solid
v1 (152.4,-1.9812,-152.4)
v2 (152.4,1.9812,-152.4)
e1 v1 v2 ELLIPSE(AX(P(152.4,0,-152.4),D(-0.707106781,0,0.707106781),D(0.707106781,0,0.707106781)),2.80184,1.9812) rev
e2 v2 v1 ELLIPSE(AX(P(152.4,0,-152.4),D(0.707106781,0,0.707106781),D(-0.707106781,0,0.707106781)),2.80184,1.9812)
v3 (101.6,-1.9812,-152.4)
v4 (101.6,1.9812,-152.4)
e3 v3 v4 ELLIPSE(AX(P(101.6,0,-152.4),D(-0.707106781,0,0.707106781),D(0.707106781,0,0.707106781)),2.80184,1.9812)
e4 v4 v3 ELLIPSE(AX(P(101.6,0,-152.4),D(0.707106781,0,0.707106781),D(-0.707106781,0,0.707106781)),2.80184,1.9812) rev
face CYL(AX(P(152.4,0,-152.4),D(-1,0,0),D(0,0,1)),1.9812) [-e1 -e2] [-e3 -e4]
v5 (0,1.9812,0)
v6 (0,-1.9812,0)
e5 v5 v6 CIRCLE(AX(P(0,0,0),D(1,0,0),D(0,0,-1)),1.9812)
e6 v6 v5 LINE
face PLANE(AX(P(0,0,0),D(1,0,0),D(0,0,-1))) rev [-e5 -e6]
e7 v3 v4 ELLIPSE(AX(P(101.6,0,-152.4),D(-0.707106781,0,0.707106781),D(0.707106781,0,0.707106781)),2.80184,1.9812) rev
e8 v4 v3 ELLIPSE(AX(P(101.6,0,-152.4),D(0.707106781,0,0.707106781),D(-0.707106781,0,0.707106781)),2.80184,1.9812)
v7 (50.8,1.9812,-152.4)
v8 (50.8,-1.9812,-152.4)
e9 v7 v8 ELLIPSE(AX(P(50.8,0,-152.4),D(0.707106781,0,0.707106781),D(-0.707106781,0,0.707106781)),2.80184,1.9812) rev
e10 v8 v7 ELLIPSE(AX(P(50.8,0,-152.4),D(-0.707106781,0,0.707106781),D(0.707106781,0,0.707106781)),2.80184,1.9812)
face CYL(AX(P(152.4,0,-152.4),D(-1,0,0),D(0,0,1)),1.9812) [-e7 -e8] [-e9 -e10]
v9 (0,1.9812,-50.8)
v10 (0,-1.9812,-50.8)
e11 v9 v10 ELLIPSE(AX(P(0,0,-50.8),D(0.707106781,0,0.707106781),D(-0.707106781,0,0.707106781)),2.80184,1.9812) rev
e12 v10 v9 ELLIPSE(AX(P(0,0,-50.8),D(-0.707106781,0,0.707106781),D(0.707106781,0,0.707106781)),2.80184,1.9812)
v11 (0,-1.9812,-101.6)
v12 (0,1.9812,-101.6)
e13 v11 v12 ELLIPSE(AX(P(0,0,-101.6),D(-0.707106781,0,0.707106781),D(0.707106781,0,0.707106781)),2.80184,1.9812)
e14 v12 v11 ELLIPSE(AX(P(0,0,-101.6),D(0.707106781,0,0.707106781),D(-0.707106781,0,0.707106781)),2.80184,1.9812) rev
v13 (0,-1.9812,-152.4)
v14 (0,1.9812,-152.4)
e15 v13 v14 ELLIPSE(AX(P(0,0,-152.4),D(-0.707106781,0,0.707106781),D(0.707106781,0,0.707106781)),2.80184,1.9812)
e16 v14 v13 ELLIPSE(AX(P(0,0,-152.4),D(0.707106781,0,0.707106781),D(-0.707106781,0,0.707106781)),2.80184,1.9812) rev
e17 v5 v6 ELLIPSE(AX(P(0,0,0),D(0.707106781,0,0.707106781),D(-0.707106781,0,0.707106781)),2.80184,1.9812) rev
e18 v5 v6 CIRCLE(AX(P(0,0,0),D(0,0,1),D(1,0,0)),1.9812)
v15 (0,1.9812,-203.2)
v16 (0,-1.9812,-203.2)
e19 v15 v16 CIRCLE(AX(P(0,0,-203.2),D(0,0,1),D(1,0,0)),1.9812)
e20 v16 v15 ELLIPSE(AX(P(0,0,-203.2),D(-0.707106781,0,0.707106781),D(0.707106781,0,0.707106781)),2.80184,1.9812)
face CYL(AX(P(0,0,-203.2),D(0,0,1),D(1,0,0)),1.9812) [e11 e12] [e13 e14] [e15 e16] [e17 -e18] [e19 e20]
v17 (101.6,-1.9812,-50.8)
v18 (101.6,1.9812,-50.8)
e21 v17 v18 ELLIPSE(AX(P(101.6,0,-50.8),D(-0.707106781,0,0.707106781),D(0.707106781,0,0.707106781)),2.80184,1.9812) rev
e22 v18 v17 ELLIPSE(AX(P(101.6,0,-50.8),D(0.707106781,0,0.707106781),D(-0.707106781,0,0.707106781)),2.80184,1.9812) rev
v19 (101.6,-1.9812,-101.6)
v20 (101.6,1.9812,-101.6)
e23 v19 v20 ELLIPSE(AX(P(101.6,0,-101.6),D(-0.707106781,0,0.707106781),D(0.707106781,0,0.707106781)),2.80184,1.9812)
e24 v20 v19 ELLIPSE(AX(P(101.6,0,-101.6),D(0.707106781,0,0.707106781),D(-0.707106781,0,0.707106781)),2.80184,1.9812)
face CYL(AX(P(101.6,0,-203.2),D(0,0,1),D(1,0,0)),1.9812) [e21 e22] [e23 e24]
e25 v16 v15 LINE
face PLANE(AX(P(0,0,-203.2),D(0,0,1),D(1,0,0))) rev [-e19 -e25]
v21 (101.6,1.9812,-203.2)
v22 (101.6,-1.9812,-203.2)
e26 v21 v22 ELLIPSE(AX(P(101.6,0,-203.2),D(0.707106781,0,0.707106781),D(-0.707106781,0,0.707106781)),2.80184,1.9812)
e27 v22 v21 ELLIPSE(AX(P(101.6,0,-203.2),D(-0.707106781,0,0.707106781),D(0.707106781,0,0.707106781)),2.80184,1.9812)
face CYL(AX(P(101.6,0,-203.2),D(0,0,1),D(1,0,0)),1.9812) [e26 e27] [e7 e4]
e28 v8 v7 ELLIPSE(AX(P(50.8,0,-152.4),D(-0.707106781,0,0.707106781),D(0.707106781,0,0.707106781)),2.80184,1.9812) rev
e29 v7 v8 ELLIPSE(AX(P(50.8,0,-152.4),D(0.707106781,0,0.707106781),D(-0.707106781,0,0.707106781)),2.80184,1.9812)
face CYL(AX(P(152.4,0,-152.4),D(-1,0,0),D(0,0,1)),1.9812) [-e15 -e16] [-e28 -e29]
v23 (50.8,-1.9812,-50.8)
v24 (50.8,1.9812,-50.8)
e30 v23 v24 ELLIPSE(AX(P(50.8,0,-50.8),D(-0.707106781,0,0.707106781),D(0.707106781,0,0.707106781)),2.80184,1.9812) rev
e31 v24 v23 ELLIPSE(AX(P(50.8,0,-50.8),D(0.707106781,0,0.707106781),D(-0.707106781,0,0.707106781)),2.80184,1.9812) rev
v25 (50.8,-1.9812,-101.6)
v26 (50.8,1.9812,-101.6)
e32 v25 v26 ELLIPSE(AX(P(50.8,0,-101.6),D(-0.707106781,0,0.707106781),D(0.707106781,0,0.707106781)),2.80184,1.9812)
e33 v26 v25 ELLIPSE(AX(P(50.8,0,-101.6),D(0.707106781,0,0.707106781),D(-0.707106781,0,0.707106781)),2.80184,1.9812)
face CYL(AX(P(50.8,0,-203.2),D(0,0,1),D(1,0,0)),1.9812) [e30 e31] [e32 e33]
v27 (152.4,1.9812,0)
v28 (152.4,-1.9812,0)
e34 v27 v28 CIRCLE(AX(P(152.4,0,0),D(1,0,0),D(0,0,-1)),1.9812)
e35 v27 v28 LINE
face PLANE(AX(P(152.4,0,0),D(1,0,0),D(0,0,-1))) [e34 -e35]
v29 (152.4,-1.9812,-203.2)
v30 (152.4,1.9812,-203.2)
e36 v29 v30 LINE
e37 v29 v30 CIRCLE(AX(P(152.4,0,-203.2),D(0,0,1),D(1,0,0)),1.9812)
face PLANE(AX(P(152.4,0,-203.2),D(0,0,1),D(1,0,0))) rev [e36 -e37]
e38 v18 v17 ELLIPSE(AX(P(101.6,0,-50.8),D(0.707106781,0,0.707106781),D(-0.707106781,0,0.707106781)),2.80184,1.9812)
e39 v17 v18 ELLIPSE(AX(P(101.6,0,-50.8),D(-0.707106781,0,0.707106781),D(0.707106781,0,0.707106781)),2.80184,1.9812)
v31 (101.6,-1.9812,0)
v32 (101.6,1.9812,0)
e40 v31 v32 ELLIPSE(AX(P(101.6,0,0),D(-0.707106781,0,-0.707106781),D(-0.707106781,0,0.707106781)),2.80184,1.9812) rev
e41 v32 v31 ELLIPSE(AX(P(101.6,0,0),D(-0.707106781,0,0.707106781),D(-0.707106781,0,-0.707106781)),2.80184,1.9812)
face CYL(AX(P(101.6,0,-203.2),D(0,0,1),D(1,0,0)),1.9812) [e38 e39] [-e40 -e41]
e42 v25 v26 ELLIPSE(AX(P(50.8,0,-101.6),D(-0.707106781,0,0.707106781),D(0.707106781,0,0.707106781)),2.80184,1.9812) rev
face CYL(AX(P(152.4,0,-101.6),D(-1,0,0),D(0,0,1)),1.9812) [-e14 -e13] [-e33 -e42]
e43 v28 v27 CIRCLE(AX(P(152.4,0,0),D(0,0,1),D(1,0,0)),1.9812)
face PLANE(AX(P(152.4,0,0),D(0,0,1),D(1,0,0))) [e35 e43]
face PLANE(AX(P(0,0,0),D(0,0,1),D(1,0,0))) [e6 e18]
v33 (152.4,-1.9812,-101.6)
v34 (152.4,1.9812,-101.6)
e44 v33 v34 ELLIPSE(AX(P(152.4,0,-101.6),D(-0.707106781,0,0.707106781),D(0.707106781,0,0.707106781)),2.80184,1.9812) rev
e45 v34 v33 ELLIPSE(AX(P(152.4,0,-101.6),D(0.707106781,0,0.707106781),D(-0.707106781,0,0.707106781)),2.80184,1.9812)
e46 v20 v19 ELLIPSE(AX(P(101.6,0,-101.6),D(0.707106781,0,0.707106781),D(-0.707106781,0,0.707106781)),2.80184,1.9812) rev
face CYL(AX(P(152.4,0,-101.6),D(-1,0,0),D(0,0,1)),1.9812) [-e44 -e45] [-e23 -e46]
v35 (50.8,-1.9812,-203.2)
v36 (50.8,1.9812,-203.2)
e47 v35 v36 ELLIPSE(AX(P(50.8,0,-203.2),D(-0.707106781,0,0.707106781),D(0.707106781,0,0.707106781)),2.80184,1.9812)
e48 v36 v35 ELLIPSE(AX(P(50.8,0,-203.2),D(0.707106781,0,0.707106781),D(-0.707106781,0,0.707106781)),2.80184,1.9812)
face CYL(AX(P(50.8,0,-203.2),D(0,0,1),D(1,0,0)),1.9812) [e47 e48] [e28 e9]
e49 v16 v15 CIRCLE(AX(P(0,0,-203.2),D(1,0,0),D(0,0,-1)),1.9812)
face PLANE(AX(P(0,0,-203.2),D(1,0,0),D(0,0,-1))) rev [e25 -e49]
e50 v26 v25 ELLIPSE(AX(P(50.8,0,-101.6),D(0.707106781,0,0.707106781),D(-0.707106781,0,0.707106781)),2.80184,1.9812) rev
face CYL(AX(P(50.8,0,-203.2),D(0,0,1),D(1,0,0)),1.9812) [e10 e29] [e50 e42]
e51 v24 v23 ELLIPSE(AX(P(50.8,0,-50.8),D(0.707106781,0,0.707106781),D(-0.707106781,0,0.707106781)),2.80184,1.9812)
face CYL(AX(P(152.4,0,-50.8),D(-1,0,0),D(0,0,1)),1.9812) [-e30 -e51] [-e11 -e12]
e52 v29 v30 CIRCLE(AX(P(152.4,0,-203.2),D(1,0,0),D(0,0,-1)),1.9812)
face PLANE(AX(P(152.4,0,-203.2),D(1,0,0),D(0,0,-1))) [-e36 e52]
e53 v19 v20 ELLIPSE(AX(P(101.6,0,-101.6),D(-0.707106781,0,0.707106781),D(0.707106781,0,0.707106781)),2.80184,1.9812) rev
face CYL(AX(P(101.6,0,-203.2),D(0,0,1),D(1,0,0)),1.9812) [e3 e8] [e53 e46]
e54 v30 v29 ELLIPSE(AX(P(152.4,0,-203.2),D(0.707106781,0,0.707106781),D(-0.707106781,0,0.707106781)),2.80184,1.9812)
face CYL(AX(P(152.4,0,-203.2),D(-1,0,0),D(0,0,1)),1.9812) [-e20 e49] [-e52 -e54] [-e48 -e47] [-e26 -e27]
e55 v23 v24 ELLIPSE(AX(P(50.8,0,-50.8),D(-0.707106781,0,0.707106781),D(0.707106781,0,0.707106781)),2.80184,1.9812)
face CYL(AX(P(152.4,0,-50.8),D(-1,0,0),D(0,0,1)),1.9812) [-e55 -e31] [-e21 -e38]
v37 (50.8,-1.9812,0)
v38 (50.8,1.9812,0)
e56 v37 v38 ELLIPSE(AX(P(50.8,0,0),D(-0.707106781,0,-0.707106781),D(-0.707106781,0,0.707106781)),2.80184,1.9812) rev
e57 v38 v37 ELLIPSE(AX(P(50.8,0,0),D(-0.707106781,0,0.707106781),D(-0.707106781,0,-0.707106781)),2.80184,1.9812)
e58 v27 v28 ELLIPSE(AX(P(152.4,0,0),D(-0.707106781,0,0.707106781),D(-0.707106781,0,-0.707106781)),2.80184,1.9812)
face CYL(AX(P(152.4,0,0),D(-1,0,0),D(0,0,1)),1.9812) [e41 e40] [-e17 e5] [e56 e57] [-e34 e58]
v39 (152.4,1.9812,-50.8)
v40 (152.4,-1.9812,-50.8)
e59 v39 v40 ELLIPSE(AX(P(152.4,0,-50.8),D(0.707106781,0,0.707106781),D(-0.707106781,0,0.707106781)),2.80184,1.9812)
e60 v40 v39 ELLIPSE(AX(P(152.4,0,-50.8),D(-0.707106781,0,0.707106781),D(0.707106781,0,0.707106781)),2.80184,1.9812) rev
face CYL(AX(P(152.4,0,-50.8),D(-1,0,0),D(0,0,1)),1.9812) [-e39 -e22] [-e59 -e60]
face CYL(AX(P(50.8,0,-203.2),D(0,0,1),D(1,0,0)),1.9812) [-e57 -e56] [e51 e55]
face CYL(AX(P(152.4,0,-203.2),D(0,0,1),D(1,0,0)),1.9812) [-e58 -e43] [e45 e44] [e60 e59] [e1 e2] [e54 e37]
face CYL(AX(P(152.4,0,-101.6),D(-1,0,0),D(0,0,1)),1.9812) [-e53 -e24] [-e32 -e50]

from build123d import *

# Parameters (mm, degrees)
SKETCH1_R           = 1.9812
BASE_EXTRUDE_DEPTH  = 203.2
SKETCH2_R           = 1.9812
BOSS_EXTRUDE1_DEPTH = 152.4
LPATTERN1_START     = -203.2
LPATTERN1_OUTLINE_R = 1.9812
LPATTERN1_DEPTH     = 203.2
LPATTERN2_COUNT     = 5
LPATTERN2_PITCH     = 50.8


# Read off the part's stored shape, not the designer's step: LPattern1
with BuildPart() as part:
    # Sketch1 → Base-Extrude (new body)
    with BuildSketch(Plane.XY):
        Circle(SKETCH1_R)
    extrude(amount=-BASE_EXTRUDE_DEPTH)

    # Sketch2 → Boss-Extrude1 (add)
    with BuildSketch(Plane(origin=(0, 0, 0), x_dir=(0, 0, -1), z_dir=(1, 0, 0))):
        Circle(SKETCH2_R)
    boss_extrude1 = extrude(amount=BOSS_EXTRUDE1_DEPTH)

    # LPattern1 outline → LPattern1 (add)
    with BuildSketch(Plane.XY.offset(LPATTERN1_START)):
        with Locations((50.8, 0)):
            Circle(LPATTERN1_OUTLINE_R)
        with Locations((101.6, 0)):
            Circle(LPATTERN1_OUTLINE_R)
        with Locations((152.4, 0)):
            Circle(LPATTERN1_OUTLINE_R)
    extrude(amount=LPATTERN1_DEPTH)

    # LPattern2: Boss-Extrude1 ×5
    with Locations(*[(0, 0, -i * LPATTERN2_PITCH) for i in range(1, LPATTERN2_COUNT)]):
        add(boss_extrude1)


solid = part.part
